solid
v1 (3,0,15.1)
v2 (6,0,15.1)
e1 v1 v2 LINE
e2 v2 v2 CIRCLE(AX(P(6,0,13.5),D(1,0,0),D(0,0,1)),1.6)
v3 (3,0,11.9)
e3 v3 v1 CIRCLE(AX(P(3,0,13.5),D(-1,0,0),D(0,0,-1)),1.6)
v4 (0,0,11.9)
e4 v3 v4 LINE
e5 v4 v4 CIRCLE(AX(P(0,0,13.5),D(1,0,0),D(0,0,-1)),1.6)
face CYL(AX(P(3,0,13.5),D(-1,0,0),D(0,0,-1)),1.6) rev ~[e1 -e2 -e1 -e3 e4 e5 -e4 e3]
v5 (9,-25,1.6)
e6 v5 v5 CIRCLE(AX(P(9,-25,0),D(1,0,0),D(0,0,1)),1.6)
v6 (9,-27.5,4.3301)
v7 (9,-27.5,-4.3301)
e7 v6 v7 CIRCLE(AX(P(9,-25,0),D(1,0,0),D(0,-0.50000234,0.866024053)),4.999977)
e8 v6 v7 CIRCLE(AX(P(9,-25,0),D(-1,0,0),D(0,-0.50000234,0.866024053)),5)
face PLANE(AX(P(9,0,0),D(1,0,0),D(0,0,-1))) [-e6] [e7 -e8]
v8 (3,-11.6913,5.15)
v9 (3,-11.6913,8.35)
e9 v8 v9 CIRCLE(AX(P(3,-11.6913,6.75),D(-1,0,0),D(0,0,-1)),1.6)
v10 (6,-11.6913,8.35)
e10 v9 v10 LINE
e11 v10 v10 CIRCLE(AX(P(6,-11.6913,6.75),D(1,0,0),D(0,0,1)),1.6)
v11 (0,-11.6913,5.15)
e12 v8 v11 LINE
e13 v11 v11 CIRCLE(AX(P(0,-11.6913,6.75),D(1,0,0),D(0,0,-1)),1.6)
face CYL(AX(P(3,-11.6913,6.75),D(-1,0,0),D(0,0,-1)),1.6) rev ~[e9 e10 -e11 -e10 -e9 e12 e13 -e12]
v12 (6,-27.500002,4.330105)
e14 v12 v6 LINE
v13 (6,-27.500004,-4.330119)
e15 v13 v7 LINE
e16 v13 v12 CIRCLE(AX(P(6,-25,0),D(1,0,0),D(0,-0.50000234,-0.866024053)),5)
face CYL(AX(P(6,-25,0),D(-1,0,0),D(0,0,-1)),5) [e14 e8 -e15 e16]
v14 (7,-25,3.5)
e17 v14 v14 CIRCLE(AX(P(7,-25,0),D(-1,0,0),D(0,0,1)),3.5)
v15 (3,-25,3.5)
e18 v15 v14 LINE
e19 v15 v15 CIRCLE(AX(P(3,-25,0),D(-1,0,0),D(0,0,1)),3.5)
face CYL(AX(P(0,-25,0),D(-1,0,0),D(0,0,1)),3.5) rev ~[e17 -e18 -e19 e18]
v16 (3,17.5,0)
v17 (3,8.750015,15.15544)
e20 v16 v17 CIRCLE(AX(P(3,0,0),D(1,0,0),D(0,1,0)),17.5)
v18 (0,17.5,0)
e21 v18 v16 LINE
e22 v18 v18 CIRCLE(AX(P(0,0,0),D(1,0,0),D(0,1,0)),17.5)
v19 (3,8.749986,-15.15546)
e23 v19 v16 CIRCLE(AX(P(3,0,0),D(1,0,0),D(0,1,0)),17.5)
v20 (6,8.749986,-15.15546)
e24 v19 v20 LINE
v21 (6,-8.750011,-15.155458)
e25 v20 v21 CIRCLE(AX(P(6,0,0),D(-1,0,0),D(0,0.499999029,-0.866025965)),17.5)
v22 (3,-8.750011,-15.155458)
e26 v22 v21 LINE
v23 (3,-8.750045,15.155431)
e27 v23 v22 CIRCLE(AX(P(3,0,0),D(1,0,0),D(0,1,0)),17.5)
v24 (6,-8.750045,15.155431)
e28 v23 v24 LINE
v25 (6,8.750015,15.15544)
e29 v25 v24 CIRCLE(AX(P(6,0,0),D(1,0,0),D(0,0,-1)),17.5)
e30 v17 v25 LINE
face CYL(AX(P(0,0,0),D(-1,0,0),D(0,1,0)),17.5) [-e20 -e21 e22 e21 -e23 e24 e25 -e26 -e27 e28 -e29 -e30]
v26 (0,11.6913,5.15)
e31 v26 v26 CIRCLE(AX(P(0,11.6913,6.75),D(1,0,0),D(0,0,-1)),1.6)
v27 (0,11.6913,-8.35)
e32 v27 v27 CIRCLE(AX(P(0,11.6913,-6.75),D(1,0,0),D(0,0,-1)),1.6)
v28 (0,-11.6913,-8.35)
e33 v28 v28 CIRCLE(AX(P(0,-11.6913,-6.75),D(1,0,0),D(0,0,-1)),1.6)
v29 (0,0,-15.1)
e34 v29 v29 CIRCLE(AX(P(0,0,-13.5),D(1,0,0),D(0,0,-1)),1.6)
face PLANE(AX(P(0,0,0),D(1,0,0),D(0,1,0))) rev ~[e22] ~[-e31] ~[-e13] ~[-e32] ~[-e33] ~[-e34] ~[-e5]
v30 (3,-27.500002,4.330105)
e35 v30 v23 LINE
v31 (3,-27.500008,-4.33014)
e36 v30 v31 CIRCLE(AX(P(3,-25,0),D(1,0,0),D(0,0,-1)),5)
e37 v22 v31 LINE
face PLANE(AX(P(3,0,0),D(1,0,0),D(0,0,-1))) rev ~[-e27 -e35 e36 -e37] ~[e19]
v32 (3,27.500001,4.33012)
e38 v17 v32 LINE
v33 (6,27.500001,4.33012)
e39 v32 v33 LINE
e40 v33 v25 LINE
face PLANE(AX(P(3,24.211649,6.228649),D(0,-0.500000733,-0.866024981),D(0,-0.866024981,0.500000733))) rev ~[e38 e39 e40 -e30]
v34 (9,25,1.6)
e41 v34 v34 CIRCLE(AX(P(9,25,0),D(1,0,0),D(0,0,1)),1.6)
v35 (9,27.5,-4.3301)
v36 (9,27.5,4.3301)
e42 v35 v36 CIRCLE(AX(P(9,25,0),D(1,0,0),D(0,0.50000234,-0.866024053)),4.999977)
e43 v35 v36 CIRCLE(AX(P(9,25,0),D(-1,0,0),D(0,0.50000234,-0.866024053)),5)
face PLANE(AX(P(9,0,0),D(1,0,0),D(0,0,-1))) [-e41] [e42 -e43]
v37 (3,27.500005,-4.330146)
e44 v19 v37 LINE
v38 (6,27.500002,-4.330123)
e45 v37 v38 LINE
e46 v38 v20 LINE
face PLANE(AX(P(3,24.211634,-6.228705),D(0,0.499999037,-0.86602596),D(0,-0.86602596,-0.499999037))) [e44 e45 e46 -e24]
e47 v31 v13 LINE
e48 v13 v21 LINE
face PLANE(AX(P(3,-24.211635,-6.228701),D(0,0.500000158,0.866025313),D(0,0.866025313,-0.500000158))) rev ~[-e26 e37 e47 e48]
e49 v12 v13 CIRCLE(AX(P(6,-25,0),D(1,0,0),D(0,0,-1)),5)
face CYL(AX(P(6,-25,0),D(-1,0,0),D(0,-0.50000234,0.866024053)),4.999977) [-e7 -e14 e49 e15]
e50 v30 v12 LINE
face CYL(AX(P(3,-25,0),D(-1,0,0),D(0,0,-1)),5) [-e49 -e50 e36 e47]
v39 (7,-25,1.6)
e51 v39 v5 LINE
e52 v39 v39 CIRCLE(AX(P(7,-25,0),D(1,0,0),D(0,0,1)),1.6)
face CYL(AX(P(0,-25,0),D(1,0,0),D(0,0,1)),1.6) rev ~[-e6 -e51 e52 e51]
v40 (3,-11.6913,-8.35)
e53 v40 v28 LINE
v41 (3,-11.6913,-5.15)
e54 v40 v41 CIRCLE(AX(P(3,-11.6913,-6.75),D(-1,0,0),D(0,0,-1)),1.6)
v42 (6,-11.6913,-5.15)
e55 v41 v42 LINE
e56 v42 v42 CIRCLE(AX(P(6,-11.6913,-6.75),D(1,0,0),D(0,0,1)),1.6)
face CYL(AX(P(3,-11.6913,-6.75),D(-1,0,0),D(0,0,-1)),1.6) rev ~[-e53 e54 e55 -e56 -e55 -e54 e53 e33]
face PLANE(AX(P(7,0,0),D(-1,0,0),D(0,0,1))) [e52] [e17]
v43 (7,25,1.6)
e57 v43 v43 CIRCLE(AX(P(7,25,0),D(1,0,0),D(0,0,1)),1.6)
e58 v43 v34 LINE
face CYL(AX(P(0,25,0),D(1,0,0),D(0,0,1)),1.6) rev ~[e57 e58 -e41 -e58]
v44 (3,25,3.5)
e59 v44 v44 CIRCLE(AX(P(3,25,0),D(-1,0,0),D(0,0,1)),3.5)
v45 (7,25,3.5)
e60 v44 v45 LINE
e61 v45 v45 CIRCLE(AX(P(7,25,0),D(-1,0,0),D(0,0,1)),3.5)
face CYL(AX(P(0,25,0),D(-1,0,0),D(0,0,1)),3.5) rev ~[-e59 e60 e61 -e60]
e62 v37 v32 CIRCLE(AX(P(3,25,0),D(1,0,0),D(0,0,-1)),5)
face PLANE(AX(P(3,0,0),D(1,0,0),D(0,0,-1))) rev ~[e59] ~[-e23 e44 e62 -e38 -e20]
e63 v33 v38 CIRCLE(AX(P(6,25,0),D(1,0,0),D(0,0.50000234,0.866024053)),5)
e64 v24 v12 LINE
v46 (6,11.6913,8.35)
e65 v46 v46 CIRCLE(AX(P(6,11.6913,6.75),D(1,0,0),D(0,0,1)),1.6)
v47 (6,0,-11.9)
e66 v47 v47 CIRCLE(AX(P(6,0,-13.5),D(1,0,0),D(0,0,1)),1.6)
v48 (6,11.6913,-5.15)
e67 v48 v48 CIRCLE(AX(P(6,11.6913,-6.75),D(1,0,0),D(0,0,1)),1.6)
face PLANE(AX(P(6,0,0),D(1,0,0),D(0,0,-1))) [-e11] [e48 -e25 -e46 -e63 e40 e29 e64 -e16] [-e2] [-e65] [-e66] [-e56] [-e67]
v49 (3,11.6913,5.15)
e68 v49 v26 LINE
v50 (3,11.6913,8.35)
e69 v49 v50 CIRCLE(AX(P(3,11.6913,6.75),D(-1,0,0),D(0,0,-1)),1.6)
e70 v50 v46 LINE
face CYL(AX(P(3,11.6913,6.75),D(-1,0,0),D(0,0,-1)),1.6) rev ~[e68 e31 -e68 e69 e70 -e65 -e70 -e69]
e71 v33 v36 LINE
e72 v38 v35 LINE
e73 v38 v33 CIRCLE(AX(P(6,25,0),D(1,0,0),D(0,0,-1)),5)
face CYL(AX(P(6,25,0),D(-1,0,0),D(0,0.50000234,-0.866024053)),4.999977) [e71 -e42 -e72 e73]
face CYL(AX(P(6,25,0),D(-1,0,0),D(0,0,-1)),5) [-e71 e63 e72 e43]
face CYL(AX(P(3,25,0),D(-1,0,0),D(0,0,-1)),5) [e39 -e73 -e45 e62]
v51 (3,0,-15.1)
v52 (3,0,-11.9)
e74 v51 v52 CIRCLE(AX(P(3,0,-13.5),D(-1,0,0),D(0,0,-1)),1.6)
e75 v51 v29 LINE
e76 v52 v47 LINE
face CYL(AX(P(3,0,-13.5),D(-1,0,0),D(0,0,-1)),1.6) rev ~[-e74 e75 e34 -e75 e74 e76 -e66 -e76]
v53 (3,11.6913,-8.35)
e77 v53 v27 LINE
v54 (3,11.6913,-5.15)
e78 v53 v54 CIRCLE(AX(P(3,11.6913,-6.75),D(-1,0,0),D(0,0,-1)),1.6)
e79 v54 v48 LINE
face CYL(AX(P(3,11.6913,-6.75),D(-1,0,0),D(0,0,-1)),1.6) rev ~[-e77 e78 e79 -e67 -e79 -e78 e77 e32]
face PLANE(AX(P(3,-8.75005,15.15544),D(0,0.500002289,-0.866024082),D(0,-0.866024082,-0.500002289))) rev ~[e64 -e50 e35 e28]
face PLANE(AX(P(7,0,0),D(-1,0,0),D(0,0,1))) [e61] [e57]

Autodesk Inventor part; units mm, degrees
ref_plane "YZ Plane" through (0, 0, 0) normal (1, 0, 0) x (0, 1, 0)
ref_plane "XZ Plane" through (0, 0, 0) normal (0, 1, 0) x (-1, 0, 0)
ref_plane "XY Plane" through (0, 0, 0) normal (0, 0, 1) x (1, 0, 0)
sketch "スケッチ1" plane through (0, 0, 0) normal (1, 0, 0) x (0, 1, 0)
  circle A0 centre (0, 0) radius 17.5
  dimension "d0" = 35
extrude "押し出し1" add sketch "スケッチ1" along normal blind 3
sketch "スケッチ2" plane through (3, 0, 0) normal (1, 0, 0) x (0, 0, -1)
  circle A0 centre (0, 0) radius 13.5
  point P0 (13.5, 0)
  point P1 (6.75, 11.6913)
  point P2 (-6.75, 11.6913)
  point P3 (-13.5, 0)
  point P4 (-6.75, -11.6913)
  point P5 (6.75, -11.6913)
  dimension "d3" = 27
  dimension "d6" = 360
hole "穴1" at (3, 0, -13.5) at (3, 11.6913, -6.75) at (3, 11.6913, 6.75) at (3, 0, 13.5) at (3, -11.6913, 6.75) at (3, -11.6913, -6.75) direction (-1, 0, 0) diameter 3.2 end through all
sketch "スケッチ4" plane through (3, 0, 0) normal (1, 0, 0) x (0, 0, -1)
  circle A0 centre (0, 0) radius 25
  circle A1 centre (0, -25) radius 5
  circle A2 centre (0, 25) radius 5
  circle A3 centre (13.5, 0) radius 1.6 projected
  circle A4 centre (-13.5, 0) radius 1.6 projected
  line L0 (-1.8583, 31.7813) -> (-19.7652, 0.7657)
  line L1 (-19.9094, -0.516) -> (-0.3337, -34.4219)
  line L2 (1.1974, -32.9261) -> (19.8479, -0.6225)
  line L3 (2.1736, 31.2353) -> (21.8646, -2.8706)
  circle A5 centre (0, 0) radius 17.5 projected
  point P0 (-4.3301, 27.5)
  point P1 (-15.1554, 8.75)
  point P2 (-15.1554, -8.75)
  point P3 (-4.3301, -27.5)
  point P4 (4.3301, -27.5)
  point P5 (15.1554, -8.75)
  point P6 (15.1554, 8.75)
  point P7 (4.3301, 27.5)
  dimension "d22" = 50
  dimension "d23" = 10
  dimension "d24" = 10
  dimension "d25" = 13.5
  dimension "d26" = 13.5
extrude "押し出し2" add sketch "スケッチ4" along normal blind 3 contours L3 A5 L0 A0 A2 | A0 A2 L3 | L2 A1 A0 | A0 A1 L1 A5 L2 | A2 A0 | A0 A2 | A5 | A1 A0 | A0 A1 | A0 L0 A2 | A1 L1 A0 | A3 | A4
sketch "スケッチ6" plane through (6, 0, 0) normal (1, 0, 0) x (0, 0, -1)
  arc A0 (4.3301, 27.5) -> (-4.3301, 27.5) centre (0, 25) ccw projected
  circle A1 centre (0, 25) radius 5
  arc A2 (-4.3301, -27.5) -> (4.3301, -27.5) centre (0, -25) ccw projected
  circle A3 centre (0, -25) radius 5
  point P0 (0, 0)
  point P1 (-4.3301, 27.5)
  point P2 (4.3301, 27.5)
  dimension "d29" = 10
  dimension "d30" = 10
extrude "押し出し3" add sketch "スケッチ6" along normal blind 3
sketch "スケッチ7" plane through (0, 0, 0) normal (-1, 0, 0) x (0, 0, 1)
  circle A0 centre (6.75, 11.6913) radius 1.6 projected
  circle A1 centre (13.5, 0) radius 1.6 projected
  circle A2 centre (6.75, -11.6913) radius 1.6 projected
  circle A3 centre (-6.75, -11.6913) radius 1.6 projected
  circle A4 centre (-13.5, 0) radius 1.6 projected
  circle A5 centre (-6.75, 11.6913) radius 1.6 projected
  arc A6 (4.3301, 27.5) -> (-4.3301, 27.5) centre (0, 25) ccw projected
  arc A7 (-4.3301, -27.5) -> (4.3301, -27.5) centre (0, -25) ccw projected
  point P0 (0, 0)
hole "穴2" at (0, 11.6913, 6.75) at (0, 0, 13.5) at (0, -11.6913, 6.75) at (0, -11.6913, -6.75) at (0, 0, -13.5) at (0, 11.6913, -6.75) at (0, 25, 0) at (0, -25, 0) direction (1, 0, 0) diameter 3.2 end through all
sketch "スケッチ9" plane through (0, 0, 0) normal (-1, 0, 0) x (0, 0, 1)
  circle A0 centre (0, 25) radius 1.6 projected
  circle A1 centre (0, 25) radius 3.5
  circle A2 centre (0, -25) radius 1.6 projected
  circle A3 centre (0, -25) radius 3.5
  point P0 (0, 0)
  point P1 (0.5822, 17.4903)
  point P2 (-0.5822, 17.4903)
  point P3 (-0.5822, -17.4903)
  point P4 (0.5822, -17.4903)
  dimension "d40" = 7
  dimension "d41" = 7
extrude "押し出し4" cut sketch "スケッチ9" against normal blind 7 contours A0 | A1 | A2 | A3
properties part number "endeff_3dp2" material "ABS プラスチック"
